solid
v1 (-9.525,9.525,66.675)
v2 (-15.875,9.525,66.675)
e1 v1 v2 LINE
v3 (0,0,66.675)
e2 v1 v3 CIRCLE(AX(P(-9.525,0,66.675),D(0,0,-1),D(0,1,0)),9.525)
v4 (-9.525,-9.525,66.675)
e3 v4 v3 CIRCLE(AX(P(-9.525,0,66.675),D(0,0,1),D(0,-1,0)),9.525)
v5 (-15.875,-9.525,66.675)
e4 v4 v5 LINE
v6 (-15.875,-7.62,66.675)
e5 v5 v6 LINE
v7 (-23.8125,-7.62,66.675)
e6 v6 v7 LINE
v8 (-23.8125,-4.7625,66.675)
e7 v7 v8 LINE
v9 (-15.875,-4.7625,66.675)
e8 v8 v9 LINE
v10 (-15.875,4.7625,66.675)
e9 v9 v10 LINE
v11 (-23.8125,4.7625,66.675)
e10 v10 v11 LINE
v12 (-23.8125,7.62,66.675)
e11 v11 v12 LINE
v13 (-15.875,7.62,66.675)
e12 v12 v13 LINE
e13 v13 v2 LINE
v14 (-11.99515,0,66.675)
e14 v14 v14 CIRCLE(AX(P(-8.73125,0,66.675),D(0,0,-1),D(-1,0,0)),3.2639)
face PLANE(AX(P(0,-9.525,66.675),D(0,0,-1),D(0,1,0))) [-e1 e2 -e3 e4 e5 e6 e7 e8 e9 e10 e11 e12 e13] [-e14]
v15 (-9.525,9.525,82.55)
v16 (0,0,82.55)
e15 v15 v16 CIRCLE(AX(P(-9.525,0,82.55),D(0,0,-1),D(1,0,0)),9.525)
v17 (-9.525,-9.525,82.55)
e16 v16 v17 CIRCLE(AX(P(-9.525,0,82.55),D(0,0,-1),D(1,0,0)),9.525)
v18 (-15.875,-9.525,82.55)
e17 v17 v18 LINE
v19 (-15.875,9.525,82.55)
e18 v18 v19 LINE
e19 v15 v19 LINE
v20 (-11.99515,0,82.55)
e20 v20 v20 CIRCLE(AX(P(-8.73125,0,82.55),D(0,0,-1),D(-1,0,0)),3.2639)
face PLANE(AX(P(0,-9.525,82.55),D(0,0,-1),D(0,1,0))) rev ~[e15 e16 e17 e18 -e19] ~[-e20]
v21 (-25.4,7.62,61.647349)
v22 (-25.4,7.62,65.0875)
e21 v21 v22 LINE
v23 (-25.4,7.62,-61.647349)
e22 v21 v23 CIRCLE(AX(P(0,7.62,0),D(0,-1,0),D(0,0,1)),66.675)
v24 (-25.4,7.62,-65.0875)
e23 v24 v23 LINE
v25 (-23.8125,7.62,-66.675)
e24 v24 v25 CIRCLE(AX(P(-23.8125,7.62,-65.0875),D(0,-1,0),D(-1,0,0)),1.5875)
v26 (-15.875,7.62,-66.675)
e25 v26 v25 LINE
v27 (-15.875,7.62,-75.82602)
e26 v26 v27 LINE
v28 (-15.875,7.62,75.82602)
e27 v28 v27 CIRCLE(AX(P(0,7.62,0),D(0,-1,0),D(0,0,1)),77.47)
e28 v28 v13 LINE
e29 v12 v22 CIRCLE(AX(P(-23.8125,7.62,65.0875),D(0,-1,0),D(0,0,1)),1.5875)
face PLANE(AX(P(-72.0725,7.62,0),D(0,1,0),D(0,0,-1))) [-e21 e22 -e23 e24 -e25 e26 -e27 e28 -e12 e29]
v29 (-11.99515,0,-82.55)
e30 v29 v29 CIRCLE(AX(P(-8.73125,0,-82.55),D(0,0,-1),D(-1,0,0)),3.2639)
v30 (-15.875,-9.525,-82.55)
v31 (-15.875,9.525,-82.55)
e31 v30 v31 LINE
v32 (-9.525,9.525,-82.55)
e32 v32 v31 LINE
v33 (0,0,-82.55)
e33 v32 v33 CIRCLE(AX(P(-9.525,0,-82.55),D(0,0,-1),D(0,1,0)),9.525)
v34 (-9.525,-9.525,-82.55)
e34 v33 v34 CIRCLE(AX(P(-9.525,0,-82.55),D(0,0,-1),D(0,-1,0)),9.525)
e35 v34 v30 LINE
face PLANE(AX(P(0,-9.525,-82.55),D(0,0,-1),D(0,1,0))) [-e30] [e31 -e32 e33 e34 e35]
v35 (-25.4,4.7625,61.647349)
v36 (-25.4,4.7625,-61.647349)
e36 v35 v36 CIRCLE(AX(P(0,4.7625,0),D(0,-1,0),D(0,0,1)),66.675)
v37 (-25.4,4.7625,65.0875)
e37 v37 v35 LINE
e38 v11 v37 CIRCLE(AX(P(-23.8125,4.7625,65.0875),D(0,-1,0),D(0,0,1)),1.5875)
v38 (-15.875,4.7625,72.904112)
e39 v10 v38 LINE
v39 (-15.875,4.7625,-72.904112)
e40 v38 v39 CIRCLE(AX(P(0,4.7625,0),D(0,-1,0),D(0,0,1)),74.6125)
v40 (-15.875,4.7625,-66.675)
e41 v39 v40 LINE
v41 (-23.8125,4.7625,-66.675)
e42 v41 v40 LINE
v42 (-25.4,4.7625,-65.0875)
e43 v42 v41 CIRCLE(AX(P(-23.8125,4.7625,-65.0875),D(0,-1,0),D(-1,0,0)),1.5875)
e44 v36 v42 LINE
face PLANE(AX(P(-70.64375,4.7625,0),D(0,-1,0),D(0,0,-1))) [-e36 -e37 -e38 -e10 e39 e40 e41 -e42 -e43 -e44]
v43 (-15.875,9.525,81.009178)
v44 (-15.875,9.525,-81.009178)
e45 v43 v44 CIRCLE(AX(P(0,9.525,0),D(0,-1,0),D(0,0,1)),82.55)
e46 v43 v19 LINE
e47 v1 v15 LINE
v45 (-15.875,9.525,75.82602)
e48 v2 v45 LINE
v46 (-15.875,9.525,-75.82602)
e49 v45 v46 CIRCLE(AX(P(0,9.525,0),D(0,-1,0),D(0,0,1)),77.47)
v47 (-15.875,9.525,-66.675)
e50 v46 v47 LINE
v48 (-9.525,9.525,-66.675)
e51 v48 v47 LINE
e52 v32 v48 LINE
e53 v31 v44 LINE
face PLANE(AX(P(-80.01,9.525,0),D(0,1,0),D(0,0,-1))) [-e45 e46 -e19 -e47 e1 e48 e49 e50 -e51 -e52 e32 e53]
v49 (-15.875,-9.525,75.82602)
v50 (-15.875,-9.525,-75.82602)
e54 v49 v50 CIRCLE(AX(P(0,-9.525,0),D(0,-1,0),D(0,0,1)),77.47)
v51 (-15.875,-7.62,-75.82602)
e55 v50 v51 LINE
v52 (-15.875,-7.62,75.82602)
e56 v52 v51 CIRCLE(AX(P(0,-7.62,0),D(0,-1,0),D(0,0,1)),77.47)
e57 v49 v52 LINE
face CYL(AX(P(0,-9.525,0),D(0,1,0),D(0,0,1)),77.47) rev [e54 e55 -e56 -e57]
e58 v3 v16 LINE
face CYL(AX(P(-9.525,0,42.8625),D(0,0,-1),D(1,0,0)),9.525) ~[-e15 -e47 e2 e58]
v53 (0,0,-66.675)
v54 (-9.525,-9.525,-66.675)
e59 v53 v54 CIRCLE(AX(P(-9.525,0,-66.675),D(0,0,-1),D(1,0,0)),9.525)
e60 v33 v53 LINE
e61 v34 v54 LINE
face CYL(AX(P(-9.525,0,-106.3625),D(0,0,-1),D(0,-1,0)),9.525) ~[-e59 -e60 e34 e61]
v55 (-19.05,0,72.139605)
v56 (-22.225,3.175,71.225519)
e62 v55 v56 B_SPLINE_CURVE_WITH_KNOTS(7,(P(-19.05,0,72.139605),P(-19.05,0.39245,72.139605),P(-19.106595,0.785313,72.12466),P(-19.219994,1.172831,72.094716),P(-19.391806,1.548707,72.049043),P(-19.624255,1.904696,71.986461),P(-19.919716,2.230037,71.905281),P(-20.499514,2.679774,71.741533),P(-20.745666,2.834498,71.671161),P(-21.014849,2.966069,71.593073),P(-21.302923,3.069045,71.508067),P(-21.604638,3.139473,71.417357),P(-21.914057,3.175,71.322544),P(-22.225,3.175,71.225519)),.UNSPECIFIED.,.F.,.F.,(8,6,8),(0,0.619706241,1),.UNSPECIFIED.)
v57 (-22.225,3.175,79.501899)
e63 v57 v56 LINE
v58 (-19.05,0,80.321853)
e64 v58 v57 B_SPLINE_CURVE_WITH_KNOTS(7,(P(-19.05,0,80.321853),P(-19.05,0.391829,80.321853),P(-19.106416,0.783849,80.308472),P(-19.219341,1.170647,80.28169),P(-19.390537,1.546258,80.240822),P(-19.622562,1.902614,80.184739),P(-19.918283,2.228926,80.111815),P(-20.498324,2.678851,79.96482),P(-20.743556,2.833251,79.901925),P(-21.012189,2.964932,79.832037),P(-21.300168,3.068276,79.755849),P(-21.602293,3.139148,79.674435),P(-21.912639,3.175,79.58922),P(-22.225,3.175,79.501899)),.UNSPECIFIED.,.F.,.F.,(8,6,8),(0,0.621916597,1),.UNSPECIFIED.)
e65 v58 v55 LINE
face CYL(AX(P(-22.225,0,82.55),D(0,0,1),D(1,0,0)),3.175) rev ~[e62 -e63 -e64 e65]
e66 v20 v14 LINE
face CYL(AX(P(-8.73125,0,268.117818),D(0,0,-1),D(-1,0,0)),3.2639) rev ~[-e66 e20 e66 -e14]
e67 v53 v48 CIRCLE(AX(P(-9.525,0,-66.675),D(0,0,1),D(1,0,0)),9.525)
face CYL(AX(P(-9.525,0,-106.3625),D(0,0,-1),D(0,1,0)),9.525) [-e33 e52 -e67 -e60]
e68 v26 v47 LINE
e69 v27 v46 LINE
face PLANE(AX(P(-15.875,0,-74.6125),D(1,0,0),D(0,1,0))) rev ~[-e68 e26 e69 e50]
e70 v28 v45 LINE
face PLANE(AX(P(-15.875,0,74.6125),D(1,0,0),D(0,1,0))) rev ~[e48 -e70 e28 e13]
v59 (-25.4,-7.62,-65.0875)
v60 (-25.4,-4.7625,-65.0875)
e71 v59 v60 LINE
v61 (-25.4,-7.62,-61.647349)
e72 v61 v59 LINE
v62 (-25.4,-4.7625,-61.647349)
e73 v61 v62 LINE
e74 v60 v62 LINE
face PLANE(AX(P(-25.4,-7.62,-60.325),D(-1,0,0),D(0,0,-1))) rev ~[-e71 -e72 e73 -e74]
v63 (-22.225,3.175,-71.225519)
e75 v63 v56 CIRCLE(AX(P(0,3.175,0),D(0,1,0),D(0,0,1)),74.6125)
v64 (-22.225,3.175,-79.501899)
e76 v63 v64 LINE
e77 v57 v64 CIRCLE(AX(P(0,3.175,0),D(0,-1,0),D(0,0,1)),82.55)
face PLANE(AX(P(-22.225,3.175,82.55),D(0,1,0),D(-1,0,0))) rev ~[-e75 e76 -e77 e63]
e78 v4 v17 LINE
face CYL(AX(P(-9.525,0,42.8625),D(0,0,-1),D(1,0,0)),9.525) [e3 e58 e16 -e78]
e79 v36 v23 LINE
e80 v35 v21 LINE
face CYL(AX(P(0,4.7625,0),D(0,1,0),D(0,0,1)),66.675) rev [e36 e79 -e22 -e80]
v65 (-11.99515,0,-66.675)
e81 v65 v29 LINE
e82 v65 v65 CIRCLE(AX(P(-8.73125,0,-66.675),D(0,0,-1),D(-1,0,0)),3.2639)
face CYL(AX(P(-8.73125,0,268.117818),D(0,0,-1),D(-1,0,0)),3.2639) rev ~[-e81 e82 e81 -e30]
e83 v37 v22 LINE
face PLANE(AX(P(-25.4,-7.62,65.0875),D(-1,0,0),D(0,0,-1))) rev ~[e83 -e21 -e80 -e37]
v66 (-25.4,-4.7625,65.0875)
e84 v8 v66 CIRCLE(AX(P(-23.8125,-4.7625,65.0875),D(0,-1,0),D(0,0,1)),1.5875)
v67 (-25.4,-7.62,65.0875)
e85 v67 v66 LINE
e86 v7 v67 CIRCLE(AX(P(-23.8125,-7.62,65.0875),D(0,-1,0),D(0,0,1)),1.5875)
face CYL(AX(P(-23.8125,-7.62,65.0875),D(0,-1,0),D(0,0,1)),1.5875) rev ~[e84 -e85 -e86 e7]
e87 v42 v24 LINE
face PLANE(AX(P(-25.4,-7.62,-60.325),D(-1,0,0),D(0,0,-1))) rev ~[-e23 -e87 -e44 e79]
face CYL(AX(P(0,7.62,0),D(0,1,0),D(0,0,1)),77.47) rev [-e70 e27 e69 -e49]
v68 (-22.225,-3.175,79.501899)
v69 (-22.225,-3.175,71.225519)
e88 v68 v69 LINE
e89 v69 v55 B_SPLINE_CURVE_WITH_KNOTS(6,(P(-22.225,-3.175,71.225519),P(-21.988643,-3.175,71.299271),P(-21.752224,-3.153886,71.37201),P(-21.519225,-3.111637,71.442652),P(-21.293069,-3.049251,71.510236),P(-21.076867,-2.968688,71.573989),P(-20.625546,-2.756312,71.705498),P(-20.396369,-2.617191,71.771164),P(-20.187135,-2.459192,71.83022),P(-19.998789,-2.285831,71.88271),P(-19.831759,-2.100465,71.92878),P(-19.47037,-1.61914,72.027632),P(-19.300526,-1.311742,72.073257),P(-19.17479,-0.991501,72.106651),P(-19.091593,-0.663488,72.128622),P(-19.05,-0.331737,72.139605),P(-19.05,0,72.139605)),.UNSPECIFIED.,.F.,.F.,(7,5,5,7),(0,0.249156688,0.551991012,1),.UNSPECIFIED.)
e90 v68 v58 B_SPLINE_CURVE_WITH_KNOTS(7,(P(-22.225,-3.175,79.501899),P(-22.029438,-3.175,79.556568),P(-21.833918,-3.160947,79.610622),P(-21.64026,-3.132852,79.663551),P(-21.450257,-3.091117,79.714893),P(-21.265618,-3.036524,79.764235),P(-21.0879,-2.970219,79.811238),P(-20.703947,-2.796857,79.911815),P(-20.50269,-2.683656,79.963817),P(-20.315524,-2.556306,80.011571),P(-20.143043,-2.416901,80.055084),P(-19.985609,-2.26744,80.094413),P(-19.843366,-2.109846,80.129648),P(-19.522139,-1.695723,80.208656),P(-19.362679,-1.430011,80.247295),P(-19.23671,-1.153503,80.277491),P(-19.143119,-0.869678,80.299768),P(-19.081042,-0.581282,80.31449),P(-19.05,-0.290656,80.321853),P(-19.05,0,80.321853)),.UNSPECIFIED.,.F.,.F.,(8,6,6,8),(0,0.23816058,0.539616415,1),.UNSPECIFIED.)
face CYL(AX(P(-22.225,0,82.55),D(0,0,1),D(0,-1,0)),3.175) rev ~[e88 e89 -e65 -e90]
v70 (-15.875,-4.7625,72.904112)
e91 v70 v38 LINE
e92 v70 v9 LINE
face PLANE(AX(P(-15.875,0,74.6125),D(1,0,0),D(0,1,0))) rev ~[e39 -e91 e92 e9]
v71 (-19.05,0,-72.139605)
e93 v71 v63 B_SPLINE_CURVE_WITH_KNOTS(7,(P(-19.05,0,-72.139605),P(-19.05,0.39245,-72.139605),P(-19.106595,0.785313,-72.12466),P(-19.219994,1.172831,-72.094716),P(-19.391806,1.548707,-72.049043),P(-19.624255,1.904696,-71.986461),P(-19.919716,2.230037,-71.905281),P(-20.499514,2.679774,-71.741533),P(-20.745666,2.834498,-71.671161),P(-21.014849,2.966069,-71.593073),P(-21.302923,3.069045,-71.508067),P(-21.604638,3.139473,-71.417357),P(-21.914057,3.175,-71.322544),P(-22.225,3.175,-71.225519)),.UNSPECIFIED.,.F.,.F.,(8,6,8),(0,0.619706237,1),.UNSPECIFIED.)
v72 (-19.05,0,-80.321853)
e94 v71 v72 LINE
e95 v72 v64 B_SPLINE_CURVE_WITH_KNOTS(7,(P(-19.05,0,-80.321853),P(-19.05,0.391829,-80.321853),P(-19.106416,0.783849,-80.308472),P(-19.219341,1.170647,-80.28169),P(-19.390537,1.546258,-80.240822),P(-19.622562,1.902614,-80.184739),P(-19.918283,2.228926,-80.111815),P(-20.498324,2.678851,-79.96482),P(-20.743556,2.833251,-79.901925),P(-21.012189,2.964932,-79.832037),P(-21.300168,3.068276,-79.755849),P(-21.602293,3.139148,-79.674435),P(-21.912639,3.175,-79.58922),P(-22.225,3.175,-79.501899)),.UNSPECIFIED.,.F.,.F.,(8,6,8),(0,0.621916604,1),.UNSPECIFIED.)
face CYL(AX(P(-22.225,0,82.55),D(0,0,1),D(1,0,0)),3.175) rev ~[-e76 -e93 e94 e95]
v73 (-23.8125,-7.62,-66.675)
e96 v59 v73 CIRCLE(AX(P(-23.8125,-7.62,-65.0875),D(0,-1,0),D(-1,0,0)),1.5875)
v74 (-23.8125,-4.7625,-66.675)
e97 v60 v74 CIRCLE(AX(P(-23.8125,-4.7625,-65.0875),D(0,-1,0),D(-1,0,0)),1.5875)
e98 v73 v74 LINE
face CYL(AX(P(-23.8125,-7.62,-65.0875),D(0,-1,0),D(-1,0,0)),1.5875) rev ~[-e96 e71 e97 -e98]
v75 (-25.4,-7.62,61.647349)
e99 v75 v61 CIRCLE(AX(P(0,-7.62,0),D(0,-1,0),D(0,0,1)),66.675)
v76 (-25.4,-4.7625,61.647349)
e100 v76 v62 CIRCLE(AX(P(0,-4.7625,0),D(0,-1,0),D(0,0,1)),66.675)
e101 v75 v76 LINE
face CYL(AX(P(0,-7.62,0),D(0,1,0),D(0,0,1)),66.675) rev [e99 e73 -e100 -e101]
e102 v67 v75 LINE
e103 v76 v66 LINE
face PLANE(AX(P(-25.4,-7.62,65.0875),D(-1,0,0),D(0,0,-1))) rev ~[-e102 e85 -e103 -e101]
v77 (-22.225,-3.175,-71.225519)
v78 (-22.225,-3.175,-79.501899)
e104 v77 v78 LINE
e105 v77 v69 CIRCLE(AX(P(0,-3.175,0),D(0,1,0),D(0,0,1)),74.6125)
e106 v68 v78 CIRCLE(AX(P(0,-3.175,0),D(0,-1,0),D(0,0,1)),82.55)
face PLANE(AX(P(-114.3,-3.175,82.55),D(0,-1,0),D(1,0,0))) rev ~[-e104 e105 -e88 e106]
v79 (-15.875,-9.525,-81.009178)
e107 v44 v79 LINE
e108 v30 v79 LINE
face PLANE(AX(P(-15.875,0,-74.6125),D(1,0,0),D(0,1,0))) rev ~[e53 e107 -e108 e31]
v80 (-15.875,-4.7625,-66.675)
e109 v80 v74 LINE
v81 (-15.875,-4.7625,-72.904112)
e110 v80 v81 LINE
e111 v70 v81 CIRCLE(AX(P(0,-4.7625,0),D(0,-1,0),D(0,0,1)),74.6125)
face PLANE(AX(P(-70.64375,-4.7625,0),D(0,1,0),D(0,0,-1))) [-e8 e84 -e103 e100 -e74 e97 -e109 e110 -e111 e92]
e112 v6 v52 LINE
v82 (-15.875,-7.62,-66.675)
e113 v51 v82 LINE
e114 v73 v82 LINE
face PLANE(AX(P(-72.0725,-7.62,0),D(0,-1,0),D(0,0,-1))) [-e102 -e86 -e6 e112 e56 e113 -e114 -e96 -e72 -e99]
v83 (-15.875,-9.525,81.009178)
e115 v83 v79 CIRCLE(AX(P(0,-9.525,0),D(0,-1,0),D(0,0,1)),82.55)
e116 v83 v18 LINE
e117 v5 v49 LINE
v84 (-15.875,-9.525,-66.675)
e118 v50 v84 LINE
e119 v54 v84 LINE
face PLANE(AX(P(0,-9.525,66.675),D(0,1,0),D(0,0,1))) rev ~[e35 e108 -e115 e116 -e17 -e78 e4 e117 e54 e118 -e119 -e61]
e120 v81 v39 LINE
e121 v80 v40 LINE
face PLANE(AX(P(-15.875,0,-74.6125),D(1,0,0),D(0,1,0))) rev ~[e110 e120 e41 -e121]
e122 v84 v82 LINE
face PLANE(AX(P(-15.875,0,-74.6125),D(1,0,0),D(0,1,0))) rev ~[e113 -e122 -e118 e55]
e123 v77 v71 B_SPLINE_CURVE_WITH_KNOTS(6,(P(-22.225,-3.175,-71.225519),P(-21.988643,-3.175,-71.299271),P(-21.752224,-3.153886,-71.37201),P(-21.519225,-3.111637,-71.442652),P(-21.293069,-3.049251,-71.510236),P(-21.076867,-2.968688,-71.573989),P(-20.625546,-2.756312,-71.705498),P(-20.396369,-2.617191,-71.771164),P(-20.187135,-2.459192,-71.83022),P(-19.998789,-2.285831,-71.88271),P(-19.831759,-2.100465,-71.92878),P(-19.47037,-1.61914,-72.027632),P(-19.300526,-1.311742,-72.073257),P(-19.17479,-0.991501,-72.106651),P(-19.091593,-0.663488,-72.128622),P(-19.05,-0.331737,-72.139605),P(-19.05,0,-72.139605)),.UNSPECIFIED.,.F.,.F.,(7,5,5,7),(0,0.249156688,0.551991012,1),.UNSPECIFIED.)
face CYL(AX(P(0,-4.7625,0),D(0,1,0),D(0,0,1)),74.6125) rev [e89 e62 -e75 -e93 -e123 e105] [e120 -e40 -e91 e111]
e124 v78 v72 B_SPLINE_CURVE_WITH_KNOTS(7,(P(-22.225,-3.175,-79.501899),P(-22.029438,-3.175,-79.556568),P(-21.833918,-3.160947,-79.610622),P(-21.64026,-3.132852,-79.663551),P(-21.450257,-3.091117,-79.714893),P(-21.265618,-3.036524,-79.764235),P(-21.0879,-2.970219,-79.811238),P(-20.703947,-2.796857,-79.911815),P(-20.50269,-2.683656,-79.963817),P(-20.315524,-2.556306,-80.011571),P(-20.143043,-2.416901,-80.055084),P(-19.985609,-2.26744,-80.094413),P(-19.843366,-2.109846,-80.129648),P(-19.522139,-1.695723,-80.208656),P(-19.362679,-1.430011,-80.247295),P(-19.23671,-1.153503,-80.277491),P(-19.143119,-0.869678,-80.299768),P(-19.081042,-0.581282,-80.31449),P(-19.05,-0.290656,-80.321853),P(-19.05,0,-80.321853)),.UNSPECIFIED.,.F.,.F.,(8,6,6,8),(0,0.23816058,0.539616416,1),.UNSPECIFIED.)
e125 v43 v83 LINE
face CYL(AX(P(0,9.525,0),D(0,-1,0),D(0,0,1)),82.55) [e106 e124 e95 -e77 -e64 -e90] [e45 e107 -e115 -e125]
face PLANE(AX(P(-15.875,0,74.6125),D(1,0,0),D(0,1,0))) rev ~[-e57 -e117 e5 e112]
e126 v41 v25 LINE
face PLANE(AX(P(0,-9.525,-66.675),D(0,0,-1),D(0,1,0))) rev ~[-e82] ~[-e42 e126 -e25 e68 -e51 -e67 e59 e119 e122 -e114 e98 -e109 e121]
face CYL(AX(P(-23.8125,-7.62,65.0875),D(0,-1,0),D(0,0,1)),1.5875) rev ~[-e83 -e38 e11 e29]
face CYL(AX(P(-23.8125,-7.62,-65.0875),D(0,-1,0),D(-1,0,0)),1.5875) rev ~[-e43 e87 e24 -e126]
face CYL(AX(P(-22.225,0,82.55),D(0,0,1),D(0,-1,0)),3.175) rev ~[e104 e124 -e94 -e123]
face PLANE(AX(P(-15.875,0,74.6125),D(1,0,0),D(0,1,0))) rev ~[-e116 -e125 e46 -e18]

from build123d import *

# Parameters (mm, degrees)
F3_W        = 19.05
F3_H        = 15.875
F4_DEPTH    = 15.875
F6_D        = 6.5278
F8_DEPTH    = 165.101
F9_T1_DEPTH = 63.5
F9_T3_DEPTH = 63.5
F11_DEPTH   = 17.1460001


# Not quite as in the source:
# - a fillet or chamfer that OpenCascade refuses, or shapes differently, is made with other operations: its cross-section is extruded or revolved along the edge and cut away or added


with BuildPart() as f2:
    # F2: sweep along a path in F0
    with BuildLine(Plane.XZ) as f2_path:
        ThreePointArc((0, 76.2), (-76.2, 0), (0, -76.2))
    # F1 (on Right) → F2 (sweep)
    with BuildSketch(Plane.YZ):
        Polygon((9.525, 82.55), (0, 82.55), (-9.525, 82.55), (-9.525, 77.47), (-7.62, 77.47), (-7.62, 66.675), (-4.7625, 66.675), (-4.7625, 74.6125), (0, 74.6125), (4.7625, 74.6125), (4.7625, 66.675), (7.62, 66.675), (7.62, 77.47), (9.525, 77.47), align=None)
    sweep(path=f2_path.line)

    # F3 (on face) → F4 (join)
    with BuildSketch(Plane.YZ):
        with Locations((0, 74.6125)):
            Rectangle(F3_W, F3_H)
        with Locations((0, -74.6125)):
            Rectangle(F3_W, F3_H)
    extrude(amount=-F4_DEPTH)

    # F6 (through all)
    with Locations(Plane.XY.offset(82.55)):
        with Locations((-8.73125, 0)):
            Hole(F6_D / 2)

    # F7 (on face) → F8 (cut, through all)
    with BuildSketch(Plane.XY.offset(82.55)):
        with BuildLine():
            Line((-22.225, 3.175), (-114.3, 3.175))
            Line((-114.3, 3.175), (-114.3, -3.175))
            Line((-114.3, -3.175), (-22.225, -3.175))
            ThreePointArc((-22.225, -3.175), (-19.9799359697, -2.2450640303), (-19.05, 0))
            ThreePointArc((-19.05, 0), (-19.9799359697, 2.2450640303), (-22.225, 3.175))
        make_face()
    extrude(amount=-F8_DEPTH, mode=Mode.SUBTRACT)

    # F9: fillet of radius 9.525 on 4 edges, made by hand

    # F9_s2 → F9_t1 (cut)
    with BuildSketch(Plane.XY.offset(42.8625)):
        with BuildLine():
            ThreePointArc((0, 0), (-2.7898079092, -6.7351920908), (-9.525, -9.525))
            Line((-9.525, -9.525), (0, -9.525))
            Line((0, -9.525), (0, 0))
        make_face()
        with BuildLine():
            ThreePointArc((0, 0), (-2.7898079092, 6.7351920908), (-9.525, 9.525))
            Line((-9.525, 9.525), (0, 9.525))
            Line((0, 9.525), (0, 0))
        make_face()
    extrude(amount=F9_T1_DEPTH, mode=Mode.SUBTRACT)

    # F9_s4 → F9_t3 (cut)
    with BuildSketch(Plane.XY.offset(-106.3625)):
        with BuildLine():
            ThreePointArc((-9.525, -9.525), (-2.7898079092, -6.7351920908), (0, 0))
            Line((0, 0), (0, -9.525))
            Line((0, -9.525), (-9.525, -9.525))
        make_face()
        with BuildLine():
            ThreePointArc((-9.525, 9.525), (-2.7898079092, 6.7351920908), (0, 0))
            Line((0, 0), (0, 9.525))
            Line((0, 9.525), (-9.525, 9.525))
        make_face()
    extrude(amount=F9_T3_DEPTH, mode=Mode.SUBTRACT)

    # F10 (on face) → F11 (cut, through all)
    with BuildSketch(Plane.XZ.offset(7.62)):
        with BuildLine():
            Line((0, 60.325), (0, 66.675))
            Line((0, 66.675), (-23.8125, 66.675))
            ThreePointArc((-23.8125, 66.675), (-24.9350320151, 66.2100320151), (-25.4, 65.0875))
            Line((-25.4, 65.0875), (-25.4, 60.325))
            Line((-25.4, 60.325), (0, 60.325))
        make_face()
        with BuildLine():
            Line((-23.8125, -66.675), (0, -66.675))
            Line((0, -66.675), (0, -60.325))
            Line((0, -60.325), (-25.4, -60.325))
            Line((-25.4, -60.325), (-25.4, -65.0875))
            ThreePointArc((-25.4, -65.0875), (-24.9350320151, -66.2100320151), (-23.8125, -66.675))
        make_face()
    extrude(amount=-F11_DEPTH, mode=Mode.SUBTRACT)


solid = f2.part
